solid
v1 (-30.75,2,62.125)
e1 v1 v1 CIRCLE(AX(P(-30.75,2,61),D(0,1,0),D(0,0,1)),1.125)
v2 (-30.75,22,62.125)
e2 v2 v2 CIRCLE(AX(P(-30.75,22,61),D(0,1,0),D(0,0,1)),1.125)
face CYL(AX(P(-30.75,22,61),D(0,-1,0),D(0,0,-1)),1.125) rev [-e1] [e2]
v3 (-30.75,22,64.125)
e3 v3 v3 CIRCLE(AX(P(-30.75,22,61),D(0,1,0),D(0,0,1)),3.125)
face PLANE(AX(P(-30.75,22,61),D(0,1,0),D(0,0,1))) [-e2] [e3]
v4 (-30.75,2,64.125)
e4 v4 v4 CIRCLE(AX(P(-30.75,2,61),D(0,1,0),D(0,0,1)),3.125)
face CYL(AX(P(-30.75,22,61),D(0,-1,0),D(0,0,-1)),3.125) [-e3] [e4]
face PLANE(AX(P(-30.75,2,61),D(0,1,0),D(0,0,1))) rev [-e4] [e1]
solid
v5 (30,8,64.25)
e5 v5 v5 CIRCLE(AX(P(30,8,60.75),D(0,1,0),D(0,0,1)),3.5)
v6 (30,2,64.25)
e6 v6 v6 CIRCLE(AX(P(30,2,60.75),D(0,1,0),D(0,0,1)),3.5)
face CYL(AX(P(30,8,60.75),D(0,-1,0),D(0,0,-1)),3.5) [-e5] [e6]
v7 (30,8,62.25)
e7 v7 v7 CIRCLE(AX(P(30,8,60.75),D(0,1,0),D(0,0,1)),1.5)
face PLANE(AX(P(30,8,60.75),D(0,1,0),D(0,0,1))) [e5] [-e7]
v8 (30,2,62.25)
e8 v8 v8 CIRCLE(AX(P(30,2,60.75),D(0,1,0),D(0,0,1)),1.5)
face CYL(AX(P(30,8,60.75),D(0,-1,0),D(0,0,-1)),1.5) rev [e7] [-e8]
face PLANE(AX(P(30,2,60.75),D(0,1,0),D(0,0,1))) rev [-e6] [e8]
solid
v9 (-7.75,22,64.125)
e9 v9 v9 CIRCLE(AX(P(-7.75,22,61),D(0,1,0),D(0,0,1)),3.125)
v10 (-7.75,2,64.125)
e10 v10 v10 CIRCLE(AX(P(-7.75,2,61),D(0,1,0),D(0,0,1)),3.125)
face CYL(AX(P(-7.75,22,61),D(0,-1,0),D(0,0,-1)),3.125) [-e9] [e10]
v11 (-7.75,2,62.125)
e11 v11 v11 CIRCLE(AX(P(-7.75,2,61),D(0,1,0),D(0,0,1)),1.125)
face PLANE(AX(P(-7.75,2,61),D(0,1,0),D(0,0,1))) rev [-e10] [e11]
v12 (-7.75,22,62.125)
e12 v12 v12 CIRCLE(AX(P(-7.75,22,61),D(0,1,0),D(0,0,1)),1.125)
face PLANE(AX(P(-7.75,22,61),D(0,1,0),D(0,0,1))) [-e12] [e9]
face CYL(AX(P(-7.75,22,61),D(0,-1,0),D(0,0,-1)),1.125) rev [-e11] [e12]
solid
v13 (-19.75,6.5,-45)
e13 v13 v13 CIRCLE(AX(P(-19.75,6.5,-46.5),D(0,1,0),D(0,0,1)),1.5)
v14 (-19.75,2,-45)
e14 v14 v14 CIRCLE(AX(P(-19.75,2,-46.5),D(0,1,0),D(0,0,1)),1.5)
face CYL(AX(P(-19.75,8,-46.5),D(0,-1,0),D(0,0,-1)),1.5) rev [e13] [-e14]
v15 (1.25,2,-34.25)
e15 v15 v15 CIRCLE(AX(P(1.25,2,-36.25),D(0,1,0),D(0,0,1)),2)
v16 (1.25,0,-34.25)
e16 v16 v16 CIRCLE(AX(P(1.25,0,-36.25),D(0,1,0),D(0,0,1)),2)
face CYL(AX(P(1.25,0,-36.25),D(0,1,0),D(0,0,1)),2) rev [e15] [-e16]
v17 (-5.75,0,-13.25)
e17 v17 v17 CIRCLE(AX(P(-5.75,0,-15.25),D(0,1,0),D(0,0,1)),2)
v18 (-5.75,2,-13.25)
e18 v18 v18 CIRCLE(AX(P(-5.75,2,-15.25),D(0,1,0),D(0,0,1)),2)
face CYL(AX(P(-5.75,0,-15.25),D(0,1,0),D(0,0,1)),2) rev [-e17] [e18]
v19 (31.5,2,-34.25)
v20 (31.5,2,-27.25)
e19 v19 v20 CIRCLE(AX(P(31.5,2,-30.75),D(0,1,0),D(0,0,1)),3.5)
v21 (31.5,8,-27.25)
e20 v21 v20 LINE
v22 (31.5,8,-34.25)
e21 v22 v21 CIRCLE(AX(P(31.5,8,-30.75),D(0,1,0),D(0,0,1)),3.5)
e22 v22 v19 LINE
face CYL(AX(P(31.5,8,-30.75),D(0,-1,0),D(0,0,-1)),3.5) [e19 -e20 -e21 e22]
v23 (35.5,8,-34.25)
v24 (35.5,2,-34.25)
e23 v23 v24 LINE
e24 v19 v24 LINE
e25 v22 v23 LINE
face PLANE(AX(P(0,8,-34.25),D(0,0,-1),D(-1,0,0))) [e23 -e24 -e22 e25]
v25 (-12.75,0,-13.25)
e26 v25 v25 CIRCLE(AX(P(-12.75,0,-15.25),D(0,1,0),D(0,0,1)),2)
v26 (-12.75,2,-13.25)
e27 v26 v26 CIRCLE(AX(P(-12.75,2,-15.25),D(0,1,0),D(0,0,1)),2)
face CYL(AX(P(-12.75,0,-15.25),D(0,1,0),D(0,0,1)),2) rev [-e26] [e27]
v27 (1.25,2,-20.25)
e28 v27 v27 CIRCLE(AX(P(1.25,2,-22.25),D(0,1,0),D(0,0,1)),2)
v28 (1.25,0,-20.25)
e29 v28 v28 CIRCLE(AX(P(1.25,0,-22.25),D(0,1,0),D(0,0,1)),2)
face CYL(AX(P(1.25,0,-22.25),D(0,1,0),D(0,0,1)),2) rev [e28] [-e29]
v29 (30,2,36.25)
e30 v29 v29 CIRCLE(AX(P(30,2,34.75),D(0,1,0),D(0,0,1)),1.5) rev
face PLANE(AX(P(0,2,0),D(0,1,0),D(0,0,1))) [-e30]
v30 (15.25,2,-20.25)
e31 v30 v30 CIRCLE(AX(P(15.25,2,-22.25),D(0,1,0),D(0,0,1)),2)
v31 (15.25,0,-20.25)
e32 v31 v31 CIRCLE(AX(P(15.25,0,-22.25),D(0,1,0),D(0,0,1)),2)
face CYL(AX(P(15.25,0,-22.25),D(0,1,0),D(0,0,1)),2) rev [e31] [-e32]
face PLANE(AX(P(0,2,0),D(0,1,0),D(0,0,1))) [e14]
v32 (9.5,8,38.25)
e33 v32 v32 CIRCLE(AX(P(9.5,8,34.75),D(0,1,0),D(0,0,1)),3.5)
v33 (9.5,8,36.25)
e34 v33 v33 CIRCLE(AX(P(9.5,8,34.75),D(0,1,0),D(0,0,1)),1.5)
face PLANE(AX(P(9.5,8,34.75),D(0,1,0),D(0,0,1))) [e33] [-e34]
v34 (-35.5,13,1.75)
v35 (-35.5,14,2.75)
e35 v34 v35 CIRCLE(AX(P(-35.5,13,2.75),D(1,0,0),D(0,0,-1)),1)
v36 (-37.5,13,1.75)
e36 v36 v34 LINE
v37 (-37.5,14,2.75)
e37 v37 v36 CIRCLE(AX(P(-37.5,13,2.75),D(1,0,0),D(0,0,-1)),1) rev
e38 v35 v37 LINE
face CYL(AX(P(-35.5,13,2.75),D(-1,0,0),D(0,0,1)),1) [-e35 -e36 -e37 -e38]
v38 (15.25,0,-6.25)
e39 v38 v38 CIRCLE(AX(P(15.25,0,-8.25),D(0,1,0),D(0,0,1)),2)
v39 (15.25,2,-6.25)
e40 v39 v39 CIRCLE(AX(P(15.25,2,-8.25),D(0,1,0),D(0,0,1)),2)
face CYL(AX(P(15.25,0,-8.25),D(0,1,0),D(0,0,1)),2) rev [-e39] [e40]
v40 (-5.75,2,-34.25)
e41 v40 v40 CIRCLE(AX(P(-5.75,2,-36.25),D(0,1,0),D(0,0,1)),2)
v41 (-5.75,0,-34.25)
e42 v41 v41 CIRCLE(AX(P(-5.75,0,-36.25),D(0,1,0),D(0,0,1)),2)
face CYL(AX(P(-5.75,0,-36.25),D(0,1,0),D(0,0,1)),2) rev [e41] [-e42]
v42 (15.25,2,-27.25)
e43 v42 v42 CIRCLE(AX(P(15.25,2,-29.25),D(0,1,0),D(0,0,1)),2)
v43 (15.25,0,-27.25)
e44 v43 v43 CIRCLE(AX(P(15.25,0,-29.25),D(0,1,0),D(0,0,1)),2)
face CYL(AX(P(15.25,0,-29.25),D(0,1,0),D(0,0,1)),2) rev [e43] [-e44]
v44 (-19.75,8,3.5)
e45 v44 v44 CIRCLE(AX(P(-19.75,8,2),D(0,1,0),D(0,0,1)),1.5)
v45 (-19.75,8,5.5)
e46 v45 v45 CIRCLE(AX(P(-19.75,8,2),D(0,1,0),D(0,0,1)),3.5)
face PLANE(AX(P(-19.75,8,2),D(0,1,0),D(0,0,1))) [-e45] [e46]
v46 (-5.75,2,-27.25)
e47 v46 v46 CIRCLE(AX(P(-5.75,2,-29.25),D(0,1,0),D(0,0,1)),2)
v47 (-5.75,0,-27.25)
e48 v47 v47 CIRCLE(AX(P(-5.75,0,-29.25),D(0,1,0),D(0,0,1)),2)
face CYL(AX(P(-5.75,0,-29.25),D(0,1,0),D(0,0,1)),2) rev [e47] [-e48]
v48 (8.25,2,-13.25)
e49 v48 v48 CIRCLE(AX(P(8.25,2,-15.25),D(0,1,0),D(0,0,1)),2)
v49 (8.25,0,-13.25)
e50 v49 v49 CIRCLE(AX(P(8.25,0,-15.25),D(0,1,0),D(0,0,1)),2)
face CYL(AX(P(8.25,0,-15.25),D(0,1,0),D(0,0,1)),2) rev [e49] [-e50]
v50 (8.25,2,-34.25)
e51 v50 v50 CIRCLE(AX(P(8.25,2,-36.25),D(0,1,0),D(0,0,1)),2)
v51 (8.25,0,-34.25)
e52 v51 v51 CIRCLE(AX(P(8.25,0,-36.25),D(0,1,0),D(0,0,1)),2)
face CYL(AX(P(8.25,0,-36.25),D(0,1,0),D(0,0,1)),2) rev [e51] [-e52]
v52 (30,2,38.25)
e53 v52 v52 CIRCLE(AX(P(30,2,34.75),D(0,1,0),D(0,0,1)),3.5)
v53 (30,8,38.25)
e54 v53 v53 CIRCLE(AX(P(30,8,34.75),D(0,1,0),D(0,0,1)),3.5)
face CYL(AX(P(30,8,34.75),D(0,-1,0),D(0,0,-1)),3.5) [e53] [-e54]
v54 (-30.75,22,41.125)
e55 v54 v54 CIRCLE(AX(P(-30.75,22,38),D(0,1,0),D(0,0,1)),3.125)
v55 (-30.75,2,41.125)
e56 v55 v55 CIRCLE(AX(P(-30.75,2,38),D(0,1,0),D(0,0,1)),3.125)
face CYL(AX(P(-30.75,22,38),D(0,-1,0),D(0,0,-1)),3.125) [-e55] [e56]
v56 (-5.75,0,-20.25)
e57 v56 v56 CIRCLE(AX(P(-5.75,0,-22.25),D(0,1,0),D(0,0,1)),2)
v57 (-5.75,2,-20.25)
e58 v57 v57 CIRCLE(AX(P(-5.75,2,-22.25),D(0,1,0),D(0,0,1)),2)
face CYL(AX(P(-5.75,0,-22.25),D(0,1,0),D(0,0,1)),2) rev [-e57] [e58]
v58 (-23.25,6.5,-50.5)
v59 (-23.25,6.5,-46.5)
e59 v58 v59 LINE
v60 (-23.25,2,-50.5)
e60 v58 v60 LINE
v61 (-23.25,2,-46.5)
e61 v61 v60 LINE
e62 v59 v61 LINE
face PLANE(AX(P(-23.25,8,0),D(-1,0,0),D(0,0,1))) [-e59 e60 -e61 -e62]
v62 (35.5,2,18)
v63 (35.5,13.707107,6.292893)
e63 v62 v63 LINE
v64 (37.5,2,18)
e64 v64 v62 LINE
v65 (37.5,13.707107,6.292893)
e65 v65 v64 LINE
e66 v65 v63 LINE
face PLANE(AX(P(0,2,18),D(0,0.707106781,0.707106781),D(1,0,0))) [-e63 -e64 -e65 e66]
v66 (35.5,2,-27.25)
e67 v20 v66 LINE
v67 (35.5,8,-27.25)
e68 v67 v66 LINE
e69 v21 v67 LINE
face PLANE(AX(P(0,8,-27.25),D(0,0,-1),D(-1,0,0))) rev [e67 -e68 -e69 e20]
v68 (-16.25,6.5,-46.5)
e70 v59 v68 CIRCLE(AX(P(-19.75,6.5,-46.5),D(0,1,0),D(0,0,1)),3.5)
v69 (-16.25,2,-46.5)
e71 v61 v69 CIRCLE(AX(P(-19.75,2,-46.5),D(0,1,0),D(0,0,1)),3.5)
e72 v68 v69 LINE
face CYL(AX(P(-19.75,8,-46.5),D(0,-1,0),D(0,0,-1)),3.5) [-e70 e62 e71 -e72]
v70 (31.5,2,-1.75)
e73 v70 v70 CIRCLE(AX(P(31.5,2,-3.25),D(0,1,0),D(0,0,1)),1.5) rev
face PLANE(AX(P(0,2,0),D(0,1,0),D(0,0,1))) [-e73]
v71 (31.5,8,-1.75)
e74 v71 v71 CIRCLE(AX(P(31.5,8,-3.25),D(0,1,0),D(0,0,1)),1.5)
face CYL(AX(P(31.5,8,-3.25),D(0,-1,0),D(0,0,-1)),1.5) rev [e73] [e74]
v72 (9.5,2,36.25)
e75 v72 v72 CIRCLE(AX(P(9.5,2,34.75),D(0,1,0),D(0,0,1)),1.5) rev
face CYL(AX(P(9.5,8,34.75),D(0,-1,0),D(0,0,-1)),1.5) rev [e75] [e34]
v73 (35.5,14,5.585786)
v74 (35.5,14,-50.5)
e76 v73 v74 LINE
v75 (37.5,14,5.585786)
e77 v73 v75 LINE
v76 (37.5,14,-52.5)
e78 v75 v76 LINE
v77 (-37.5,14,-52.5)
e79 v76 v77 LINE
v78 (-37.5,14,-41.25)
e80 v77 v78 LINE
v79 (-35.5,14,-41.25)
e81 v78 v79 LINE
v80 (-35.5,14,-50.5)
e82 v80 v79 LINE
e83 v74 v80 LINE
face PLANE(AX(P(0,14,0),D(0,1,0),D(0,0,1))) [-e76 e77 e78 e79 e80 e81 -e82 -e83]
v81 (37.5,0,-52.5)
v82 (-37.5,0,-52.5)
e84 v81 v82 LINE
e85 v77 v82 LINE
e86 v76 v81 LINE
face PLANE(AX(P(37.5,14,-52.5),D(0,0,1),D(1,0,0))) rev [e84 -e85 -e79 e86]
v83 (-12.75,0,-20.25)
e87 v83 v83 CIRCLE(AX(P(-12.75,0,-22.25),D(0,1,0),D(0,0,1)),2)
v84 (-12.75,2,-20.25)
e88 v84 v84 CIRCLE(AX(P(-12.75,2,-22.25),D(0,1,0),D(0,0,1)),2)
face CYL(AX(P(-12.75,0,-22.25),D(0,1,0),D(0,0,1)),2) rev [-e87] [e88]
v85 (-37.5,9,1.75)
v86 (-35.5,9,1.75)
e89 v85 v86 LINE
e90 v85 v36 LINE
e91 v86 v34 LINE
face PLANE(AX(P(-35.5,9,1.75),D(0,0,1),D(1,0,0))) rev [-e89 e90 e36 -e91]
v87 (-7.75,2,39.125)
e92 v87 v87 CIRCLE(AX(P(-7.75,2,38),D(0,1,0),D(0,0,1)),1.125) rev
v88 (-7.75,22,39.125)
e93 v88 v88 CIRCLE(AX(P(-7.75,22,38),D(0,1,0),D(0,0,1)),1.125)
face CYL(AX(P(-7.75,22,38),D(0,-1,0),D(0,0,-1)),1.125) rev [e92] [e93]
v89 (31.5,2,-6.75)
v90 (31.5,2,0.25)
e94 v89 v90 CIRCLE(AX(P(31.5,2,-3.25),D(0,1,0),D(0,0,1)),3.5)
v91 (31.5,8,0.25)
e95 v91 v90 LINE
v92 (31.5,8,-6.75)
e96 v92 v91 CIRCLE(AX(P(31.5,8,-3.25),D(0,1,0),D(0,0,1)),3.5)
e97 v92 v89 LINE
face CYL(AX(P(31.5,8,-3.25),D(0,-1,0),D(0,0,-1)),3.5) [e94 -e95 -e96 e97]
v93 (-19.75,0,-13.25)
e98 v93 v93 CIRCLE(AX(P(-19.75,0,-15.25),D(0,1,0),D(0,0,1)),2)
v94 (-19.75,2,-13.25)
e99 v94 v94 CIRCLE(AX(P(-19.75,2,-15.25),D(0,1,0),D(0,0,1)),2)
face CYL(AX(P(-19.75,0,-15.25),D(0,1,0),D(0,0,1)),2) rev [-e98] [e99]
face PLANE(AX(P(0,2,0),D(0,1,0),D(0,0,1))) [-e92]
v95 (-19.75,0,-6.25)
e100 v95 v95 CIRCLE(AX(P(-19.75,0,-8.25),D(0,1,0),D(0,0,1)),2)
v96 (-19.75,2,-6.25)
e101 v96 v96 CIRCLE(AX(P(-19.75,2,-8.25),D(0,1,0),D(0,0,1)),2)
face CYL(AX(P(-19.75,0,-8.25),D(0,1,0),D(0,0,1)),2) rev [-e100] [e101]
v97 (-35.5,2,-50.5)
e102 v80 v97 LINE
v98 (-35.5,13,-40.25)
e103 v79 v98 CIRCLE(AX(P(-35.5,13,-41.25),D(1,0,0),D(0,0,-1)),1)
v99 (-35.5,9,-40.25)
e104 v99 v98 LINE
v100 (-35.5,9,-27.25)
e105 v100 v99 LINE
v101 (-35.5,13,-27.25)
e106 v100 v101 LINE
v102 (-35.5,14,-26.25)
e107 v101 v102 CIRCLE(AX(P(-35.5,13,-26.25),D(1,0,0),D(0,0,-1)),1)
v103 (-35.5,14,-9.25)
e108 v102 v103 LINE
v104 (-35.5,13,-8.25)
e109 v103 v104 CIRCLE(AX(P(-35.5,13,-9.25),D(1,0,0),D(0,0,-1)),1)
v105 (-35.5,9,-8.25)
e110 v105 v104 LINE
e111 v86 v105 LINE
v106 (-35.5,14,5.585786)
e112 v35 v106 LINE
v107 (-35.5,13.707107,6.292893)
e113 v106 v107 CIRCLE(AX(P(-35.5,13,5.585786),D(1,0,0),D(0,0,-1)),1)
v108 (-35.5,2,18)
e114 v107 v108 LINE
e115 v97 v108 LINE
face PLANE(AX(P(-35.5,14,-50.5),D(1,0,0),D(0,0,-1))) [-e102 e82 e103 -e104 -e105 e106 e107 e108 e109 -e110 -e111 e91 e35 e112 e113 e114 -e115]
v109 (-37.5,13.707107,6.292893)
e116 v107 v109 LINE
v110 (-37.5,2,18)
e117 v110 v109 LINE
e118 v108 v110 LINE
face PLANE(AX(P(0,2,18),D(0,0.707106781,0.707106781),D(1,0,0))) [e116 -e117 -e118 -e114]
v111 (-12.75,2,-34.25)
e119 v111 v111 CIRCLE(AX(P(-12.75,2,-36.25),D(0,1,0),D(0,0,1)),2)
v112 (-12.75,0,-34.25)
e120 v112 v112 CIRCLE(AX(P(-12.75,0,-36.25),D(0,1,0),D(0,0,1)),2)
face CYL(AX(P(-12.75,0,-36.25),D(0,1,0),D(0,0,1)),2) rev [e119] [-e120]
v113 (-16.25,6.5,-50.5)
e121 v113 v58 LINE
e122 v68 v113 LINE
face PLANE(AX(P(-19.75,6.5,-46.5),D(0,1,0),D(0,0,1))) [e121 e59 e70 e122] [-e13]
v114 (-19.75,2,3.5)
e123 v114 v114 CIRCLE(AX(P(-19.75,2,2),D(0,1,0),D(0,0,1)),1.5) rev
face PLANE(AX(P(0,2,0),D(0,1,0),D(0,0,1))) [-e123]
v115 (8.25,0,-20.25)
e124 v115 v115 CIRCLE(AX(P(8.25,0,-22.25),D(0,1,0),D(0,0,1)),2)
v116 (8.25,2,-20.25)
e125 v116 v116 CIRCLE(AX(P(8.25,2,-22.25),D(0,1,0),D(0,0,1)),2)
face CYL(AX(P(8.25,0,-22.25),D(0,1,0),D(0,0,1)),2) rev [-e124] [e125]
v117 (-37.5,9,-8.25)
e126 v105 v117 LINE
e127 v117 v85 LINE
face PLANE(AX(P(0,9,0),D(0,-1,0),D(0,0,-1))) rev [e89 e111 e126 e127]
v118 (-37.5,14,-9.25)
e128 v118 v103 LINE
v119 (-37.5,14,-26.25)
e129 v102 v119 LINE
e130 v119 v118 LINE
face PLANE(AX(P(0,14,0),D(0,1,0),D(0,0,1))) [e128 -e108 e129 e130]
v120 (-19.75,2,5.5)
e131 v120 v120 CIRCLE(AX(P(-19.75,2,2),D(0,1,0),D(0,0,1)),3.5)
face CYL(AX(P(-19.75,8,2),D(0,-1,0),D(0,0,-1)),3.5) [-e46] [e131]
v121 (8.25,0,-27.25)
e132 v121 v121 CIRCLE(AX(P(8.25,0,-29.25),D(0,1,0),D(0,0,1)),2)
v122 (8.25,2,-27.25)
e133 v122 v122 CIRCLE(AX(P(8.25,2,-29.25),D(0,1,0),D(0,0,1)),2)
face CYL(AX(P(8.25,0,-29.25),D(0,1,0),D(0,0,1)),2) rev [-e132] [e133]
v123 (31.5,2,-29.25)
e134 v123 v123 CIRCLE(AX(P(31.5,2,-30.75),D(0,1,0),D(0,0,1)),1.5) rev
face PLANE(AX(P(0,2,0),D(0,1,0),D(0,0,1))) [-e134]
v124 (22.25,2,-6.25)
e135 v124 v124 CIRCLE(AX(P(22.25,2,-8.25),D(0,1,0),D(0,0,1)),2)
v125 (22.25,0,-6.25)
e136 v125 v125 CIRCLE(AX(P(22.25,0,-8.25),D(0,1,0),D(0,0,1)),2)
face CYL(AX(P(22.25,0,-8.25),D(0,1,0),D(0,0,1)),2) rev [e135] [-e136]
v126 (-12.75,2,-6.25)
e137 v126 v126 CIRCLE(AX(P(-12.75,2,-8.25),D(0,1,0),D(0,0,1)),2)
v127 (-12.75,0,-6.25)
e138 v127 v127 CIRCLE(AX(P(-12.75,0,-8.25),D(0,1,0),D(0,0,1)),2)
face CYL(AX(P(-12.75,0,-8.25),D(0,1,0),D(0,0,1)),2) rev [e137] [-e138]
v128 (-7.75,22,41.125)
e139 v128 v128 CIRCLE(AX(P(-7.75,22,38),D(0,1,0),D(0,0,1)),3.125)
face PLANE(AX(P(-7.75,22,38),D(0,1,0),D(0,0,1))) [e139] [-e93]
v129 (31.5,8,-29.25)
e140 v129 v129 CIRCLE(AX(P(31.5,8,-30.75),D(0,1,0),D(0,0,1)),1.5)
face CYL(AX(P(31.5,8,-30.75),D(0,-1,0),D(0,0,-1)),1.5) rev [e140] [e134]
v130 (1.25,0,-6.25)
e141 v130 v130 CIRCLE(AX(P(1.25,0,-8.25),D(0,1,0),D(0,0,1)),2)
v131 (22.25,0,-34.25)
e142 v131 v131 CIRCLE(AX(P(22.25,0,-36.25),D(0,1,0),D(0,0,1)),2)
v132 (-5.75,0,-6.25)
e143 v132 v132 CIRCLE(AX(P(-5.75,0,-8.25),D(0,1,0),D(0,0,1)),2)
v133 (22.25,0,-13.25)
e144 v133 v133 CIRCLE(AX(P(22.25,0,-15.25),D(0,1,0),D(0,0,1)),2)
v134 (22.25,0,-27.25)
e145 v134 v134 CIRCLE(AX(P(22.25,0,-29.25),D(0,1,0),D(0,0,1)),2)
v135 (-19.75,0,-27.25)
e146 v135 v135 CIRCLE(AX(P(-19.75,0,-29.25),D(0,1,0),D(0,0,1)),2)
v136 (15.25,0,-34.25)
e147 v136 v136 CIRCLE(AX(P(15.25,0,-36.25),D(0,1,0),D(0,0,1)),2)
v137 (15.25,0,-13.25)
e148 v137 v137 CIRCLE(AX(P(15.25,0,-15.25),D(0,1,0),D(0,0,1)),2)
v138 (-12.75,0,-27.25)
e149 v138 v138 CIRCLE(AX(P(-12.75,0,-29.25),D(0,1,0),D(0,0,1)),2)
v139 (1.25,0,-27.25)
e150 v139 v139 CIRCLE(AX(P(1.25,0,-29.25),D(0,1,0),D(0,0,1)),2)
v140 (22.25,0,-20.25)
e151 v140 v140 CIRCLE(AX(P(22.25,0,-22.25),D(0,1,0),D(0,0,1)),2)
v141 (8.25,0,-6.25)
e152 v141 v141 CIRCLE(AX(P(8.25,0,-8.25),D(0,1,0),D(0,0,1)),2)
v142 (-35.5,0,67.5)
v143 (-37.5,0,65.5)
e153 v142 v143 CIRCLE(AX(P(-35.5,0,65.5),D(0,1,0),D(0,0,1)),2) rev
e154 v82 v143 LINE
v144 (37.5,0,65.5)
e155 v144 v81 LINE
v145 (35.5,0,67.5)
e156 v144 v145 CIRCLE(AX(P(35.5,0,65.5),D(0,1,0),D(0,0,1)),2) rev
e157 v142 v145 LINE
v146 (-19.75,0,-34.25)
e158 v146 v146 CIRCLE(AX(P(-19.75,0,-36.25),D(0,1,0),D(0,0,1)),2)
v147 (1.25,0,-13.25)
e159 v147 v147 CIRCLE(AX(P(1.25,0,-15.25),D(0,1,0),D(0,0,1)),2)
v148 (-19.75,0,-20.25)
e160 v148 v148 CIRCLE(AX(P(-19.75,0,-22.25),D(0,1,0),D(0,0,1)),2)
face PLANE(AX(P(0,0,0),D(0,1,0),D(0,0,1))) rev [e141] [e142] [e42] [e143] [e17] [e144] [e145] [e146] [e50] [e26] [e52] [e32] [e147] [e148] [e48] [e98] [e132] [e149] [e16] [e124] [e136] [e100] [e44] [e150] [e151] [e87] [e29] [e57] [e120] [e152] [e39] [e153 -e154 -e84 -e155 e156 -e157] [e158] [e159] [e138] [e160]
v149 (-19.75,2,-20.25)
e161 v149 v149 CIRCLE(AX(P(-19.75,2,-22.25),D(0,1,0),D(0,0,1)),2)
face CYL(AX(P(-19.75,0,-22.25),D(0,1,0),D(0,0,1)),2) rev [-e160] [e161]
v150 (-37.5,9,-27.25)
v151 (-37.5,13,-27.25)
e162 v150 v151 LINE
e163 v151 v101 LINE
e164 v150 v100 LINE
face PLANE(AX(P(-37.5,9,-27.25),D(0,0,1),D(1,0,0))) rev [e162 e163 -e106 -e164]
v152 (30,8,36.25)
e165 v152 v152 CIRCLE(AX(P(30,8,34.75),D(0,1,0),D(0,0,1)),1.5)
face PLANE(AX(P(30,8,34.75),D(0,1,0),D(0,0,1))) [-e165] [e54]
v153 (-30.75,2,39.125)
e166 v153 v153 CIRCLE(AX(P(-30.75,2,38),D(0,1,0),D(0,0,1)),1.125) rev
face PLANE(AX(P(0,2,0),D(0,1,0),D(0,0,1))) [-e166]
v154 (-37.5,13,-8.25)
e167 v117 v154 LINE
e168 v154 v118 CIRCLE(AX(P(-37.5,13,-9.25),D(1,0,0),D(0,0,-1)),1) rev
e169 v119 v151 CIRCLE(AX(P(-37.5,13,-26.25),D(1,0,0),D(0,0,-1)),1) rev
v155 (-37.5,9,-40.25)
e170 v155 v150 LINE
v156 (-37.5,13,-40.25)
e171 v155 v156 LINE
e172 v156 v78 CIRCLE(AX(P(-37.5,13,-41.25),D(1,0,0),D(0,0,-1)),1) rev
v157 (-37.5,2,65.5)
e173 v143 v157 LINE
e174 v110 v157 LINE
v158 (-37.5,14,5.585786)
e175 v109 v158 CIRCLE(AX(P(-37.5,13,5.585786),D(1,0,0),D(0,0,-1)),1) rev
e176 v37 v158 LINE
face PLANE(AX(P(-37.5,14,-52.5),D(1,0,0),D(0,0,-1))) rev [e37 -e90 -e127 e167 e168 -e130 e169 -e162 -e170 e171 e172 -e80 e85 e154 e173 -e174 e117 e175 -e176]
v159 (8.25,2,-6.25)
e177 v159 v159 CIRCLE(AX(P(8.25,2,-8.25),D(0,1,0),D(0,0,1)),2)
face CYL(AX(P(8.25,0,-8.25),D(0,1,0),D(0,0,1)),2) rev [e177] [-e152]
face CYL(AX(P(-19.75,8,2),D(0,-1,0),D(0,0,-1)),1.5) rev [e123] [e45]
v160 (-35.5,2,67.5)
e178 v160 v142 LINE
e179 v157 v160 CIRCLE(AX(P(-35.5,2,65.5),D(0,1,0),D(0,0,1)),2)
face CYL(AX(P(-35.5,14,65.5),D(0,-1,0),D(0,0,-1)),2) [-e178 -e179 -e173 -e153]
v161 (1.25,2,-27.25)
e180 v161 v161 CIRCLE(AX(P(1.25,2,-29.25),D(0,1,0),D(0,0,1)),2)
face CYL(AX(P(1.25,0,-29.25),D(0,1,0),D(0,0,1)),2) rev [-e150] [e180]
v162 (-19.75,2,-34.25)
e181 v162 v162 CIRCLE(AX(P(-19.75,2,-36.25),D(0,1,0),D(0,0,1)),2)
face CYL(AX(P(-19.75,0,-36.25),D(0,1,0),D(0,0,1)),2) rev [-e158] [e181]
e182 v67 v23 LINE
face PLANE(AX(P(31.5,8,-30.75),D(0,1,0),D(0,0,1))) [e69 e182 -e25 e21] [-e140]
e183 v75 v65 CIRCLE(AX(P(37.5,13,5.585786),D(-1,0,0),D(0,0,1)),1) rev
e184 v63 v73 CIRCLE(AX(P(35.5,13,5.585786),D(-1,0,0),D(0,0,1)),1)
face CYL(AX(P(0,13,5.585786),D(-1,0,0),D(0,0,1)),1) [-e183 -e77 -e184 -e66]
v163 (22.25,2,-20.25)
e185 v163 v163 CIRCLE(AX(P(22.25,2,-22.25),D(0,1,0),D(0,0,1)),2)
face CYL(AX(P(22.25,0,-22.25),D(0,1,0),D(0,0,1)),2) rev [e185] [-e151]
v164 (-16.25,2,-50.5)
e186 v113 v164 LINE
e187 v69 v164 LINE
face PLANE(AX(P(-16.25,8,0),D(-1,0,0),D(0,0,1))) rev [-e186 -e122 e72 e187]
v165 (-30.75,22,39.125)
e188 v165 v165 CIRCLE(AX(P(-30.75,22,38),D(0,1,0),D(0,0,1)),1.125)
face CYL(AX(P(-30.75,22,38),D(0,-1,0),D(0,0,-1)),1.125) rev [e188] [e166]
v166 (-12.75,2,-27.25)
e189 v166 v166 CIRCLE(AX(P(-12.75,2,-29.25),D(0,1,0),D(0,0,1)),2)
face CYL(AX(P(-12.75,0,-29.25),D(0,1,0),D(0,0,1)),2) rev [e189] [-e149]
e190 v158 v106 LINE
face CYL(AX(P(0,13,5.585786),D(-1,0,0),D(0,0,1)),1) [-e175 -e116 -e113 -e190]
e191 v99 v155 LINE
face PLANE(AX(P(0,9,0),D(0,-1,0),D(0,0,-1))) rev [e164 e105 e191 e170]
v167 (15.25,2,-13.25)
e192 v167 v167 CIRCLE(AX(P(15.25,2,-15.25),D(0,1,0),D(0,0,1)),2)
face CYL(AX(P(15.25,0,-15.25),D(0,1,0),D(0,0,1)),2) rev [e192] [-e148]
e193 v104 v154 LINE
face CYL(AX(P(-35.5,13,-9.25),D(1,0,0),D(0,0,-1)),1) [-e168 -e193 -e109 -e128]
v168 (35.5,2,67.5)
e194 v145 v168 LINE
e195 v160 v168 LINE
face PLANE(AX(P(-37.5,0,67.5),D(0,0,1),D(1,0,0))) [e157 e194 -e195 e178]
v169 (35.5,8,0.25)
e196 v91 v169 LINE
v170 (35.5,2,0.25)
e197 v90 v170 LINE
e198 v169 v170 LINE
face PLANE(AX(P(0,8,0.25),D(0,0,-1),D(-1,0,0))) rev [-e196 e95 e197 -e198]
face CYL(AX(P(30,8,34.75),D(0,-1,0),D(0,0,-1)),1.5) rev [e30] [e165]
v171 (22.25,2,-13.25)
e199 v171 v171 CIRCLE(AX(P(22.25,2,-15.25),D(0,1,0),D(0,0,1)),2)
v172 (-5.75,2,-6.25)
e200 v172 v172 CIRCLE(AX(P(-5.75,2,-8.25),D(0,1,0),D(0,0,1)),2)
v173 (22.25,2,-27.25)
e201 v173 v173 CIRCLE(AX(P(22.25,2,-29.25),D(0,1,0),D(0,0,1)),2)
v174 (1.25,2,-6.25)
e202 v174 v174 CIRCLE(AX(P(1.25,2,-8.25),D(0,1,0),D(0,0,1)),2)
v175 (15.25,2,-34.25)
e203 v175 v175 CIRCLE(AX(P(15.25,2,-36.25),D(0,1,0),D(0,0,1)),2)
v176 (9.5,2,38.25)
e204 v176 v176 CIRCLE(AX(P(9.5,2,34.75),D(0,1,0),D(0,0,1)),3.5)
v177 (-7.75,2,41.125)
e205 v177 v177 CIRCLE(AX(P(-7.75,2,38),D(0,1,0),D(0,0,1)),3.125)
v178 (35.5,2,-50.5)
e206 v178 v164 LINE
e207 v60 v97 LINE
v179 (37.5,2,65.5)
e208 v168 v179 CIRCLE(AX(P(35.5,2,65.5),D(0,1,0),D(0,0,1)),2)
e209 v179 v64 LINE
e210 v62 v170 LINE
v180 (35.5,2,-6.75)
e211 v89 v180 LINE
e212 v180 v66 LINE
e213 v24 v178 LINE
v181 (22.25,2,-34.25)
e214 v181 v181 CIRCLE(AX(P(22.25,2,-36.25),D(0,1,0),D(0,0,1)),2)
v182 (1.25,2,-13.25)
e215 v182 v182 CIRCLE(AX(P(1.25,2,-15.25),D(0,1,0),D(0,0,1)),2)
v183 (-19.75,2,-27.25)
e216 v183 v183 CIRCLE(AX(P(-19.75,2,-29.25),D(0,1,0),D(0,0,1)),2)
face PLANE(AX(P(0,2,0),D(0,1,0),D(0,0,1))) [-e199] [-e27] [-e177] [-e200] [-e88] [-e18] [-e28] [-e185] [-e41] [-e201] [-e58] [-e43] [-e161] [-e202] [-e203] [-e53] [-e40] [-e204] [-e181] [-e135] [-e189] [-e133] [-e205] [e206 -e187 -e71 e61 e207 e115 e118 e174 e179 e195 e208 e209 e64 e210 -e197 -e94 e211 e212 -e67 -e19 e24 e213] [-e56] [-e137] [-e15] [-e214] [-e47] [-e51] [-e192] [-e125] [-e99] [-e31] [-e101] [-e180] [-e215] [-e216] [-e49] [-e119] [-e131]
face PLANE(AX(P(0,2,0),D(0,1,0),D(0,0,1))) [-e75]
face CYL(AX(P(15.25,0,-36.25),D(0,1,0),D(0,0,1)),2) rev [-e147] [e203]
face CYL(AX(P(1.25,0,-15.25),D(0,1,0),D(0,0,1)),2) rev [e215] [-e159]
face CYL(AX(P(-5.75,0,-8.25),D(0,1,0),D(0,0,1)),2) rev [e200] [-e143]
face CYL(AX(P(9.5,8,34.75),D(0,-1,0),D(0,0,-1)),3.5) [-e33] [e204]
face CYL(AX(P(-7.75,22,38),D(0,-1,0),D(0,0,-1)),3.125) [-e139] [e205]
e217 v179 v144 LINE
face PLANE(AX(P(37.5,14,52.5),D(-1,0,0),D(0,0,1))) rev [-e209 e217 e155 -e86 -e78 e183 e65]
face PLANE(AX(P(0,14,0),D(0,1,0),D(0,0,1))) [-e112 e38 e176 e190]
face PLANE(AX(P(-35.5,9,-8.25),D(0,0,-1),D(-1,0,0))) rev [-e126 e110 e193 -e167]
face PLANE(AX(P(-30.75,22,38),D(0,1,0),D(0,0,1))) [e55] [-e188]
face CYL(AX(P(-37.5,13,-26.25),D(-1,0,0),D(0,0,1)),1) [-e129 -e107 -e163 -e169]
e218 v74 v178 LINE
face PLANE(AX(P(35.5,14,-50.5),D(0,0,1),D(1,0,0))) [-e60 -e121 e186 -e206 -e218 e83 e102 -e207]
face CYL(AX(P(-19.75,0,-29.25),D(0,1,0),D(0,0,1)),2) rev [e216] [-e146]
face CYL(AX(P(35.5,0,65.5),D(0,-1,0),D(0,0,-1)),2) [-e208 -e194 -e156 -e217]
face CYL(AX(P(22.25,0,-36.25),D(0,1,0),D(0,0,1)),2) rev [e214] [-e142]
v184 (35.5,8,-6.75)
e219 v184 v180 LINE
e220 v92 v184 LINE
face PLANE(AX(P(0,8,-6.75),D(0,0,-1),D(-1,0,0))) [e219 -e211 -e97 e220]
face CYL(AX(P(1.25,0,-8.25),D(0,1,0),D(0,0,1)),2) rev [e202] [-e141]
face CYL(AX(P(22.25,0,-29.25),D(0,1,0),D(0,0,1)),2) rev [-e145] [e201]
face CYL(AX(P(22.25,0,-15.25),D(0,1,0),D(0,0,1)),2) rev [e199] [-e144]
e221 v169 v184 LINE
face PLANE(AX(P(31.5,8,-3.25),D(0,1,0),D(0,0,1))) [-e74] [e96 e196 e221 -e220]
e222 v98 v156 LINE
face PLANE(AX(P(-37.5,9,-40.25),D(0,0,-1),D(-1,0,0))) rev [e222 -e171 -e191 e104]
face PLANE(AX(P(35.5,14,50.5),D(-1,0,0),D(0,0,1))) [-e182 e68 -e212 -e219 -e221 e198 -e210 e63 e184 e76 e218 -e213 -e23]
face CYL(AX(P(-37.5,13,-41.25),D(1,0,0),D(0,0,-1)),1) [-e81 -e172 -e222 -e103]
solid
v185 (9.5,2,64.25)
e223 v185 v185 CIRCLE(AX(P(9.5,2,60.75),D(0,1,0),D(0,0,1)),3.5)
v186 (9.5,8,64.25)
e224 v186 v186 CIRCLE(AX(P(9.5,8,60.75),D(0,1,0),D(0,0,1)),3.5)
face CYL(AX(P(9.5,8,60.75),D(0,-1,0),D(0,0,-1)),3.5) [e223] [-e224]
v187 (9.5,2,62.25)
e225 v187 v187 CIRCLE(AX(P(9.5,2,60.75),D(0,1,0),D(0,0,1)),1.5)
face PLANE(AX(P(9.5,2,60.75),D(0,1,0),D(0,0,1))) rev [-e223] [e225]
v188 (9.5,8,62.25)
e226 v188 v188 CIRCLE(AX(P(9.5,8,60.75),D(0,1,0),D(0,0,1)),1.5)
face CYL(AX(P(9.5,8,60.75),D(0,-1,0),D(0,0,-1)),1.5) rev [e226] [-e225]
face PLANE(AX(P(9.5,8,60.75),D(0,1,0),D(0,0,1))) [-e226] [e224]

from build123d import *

# Parameters (mm, degrees)
SKETCH1_W                = 70
SKETCH1_H                = 100
BOSS_EXTRUDE1_DEPTH      = 2
SKETCH2_R                = 3.5
SKETCH2_R_2              = 1.5
BOSS_EXTRUDE2_DEPTH      = 6
BOSS_EXTRUDE3_START      = -2
SKETCH3_R                = 3.5
BOSS_EXTRUDE3_DEPTH      = 2
BOSS_EXTRUDE4_DEPTH      = 12
BOSS_EXTRUDE4_DEPTH_BACK = 2
SKETCH4_W                = 75
SKETCH4_H                = 105
SKETCH4_W_2              = 71
SKETCH4_H_2              = 101
BOSS_EXTRUDE5_DEPTH      = 6
SKETCH8_W                = 75
SKETCH8_H                = 46.5
CUT_EXTRUDE1_DEPTH       = 66.623928563
SKETCH9_W                = 2
SKETCH9_H                = 13
SKETCH9_H_2              = 10
CUT_EXTRUDE2_DEPTH       = 5
CHAMFER1_SIZE            = 12
FILLET2_START            = -38
FILLET2_DEPTH            = 73.5
FILLET2_START_2          = -35.5
FILLET2_2_DEPTH          = 73.5
SKETCH10_R               = 3.5
SKETCH10_R_2             = 1.5
BOSS_EXTRUDE6_DEPTH      = 6
SKETCH11_R               = 3.125
SKETCH11_R_2             = 1.125
BOSS_EXTRUDE7_DEPTH      = 20
SKETCH12_R               = 2
CUT_EXTRUDE3_DEPTH       = 78.034489029
SKETCH14_W               = 75
SKETCH14_H               = 15
BOSS_EXTRUDE8_DEPTH      = 2
FILLET3_R                = 2
CUT_EXTRUDE4_DEPTH       = 1.5


with BuildPart() as part:
    # Sketch1 → Boss-Extrude1 (new body)
    with BuildSketch(Plane(origin=(0, 0, 0), x_dir=(1, 0, 0), z_dir=(0, 1, 0))):
        Rectangle(SKETCH1_W, SKETCH1_H)
    extrude(amount=BOSS_EXTRUDE1_DEPTH)

    # Sketch2 → Boss-Extrude2 (add)
    # profile 1 of 4: a face of its own
    with BuildSketch(Plane(origin=(0, 2, 0), x_dir=(1, 0, 0), z_dir=(0, 1, 0))):
        with Locations(Location((-19.75, 46.5, 0), (0, 0, 90))):
            Circle(SKETCH2_R)
        with Locations(Location((-19.75, 46.5, 0), (0, 0, 270))):
            Circle(SKETCH2_R_2, mode=Mode.SUBTRACT)
    # profile 2 of 4: a face of its own
    with BuildSketch(Plane(origin=(0, 2, 0), x_dir=(1, 0, 0), z_dir=(0, 1, 0))):
        with Locations((31.5, 30.75)):
            Circle(SKETCH2_R)
        with Locations(Location((31.5, 30.75, 0), (0, 0, 270))):
            Circle(SKETCH2_R_2, mode=Mode.SUBTRACT)
    # profile 3 of 4: a face of its own
    with BuildSketch(Plane(origin=(0, 2, 0), x_dir=(1, 0, 0), z_dir=(0, 1, 0))):
        with Locations((31.5, 3.25)):
            Circle(SKETCH2_R)
        with Locations(Location((31.5, 3.25, 0), (0, 0, 270))):
            Circle(SKETCH2_R_2, mode=Mode.SUBTRACT)
    # profile 4 of 4: a face of its own
    with BuildSketch(Plane(origin=(0, 2, 0), x_dir=(1, 0, 0), z_dir=(0, 1, 0))):
        with Locations(Location((-19.75, -2, 0), (0, 0, 270))):
            Circle(SKETCH2_R)
        with Locations(Location((-19.75, -2, 0), (0, 0, 270))):
            Circle(SKETCH2_R_2, mode=Mode.SUBTRACT)
    extrude(amount=BOSS_EXTRUDE2_DEPTH)

    # Sketch3 → Boss-Extrude3 (add)
    # profile 1 of 4: a face of its own
    with BuildSketch(Plane(origin=(0, 2, 0), x_dir=(1, 0, 0), z_dir=(0, 1, 0)).offset(BOSS_EXTRUDE3_START)):
        Polygon((-19.75, 50.5), (-35.5, 50.5), (-35.5, -50.5), (35.5, -50.5), (35.5, 3.25), (35.5, 50.5), align=None)
        Polygon((35, -50), (35, 3.25), (35, 30.75), (35, 50), (-19.75, 50), (-35, 50), (-35, -50), align=None, mode=Mode.SUBTRACT)
    # profile 2 of 4: a face of its own
    with BuildSketch(Plane(origin=(0, 2, 0), x_dir=(1, 0, 0), z_dir=(0, 1, 0)).offset(BOSS_EXTRUDE3_START)):
        with Locations(Location((31.5, 3.25, 0), (0, 0, 270))):
            Circle(SKETCH3_R)
    # profile 3 of 4: a face of its own
    with BuildSketch(Plane(origin=(0, 2, 0), x_dir=(1, 0, 0), z_dir=(0, 1, 0)).offset(BOSS_EXTRUDE3_START)):
        with Locations(Location((31.5, 30.75, 0), (0, 0, 270))):
            Circle(SKETCH3_R)
    # profile 4 of 4: a face of its own
    with BuildSketch(Plane(origin=(0, 2, 0), x_dir=(1, 0, 0), z_dir=(0, 1, 0)).offset(BOSS_EXTRUDE3_START)):
        with Locations(Location((-19.75, 46.5, 0), (0, 0, 270))):
            Circle(SKETCH3_R)
    extrude(amount=BOSS_EXTRUDE3_DEPTH)

    # Sketch4 → Boss-Extrude4 (add, two sides: drawn at the far end of the back side and taken through both)
    with BuildSketch(Plane(origin=(0, 2, 0), x_dir=(1, 0, 0), z_dir=(0, 1, 0)).offset(-BOSS_EXTRUDE4_DEPTH_BACK)):
        Rectangle(SKETCH4_W, SKETCH4_H)
        Rectangle(SKETCH4_W_2, SKETCH4_H_2, mode=Mode.SUBTRACT)
    extrude(amount=BOSS_EXTRUDE4_DEPTH + BOSS_EXTRUDE4_DEPTH_BACK)

    # Sketch6 → Boss-Extrude5 (add)
    with BuildSketch(Plane(origin=(0, 2, 0), x_dir=(1, 0, 0), z_dir=(0, 1, 0))):
        with BuildLine():
            Line((31.5, -0.25), (35.5, -0.25))
            Line((35.5, -0.25), (35.5, 6.75))
            Line((35.5, 6.75), (31.5, 6.75))
            ThreePointArc((31.5, 6.75), (33.974873734, 5.724873734), (35, 3.25))
            ThreePointArc((35, 3.25), (33.974873734, 0.775126266), (31.5, -0.25))
        make_face()
        with BuildLine():
            Line((31.5, 27.25), (35.5, 27.25))
            Line((35.5, 27.25), (35.5, 34.25))
            Line((35.5, 34.25), (31.5, 34.25))
            ThreePointArc((31.5, 34.25), (33.974873734, 33.224873734), (35, 30.75))
            ThreePointArc((35, 30.75), (33.974873734, 28.275126266), (31.5, 27.25))
        make_face()
        with BuildLine():
            Line((-16.25, 46.5), (-16.25, 50.5))
            Line((-16.25, 50.5), (-23.25, 50.5))
            Line((-23.25, 50.5), (-23.25, 46.5))
            ThreePointArc((-23.25, 46.5), (-19.75, 50), (-16.25, 46.5))
        make_face()
    extrude(amount=BOSS_EXTRUDE5_DEPTH)

    # Sketch8 → Cut-Extrude1 (cut, through all)
    with BuildSketch(Plane(origin=(0, 2, 0), x_dir=(1, 0, 0), z_dir=(0, 1, 0))):
        with Locations((0, -29.25)):
            Rectangle(SKETCH8_W, SKETCH8_H)
    extrude(amount=CUT_EXTRUDE1_DEPTH, mode=Mode.SUBTRACT)

    # Sketch9 → Cut-Extrude2 (cut)
    with BuildSketch(Plane(origin=(0, 14, 0), x_dir=(1, 0, 0), z_dir=(0, 1, 0))):
        with Locations((-36.5, 33.75)):
            Rectangle(SKETCH9_W, SKETCH9_H)
        with Locations((-36.5, 3.25)):
            Rectangle(SKETCH9_W, SKETCH9_H_2)
    extrude(amount=-CUT_EXTRUDE2_DEPTH, mode=Mode.SUBTRACT)

    # Chamfer1
    chamfer1_edges = [part.edges().sort_by_distance(p)[0] for p in [
        (36.5, 2, 6),
        (-36.5, 2, 6),
    ]]
    chamfer(chamfer1_edges, length=CHAMFER1_SIZE - 0.0001)  # a hair under: the kernel refuses the full size

    # Fillet2: read off the stored shape, not the designer's step
    # Fillet2 outline → Fillet2 (cut)
    with BuildSketch(Plane.YZ.offset(FILLET2_START)):
        with BuildLine():
            Line((14, 6), (13.707106781, 6.292893219))
            ThreePointArc((13.707106781, 6.292893219), (13.923879533, 5.96846987), (14, 5.585786438))
            Line((14, 5.585786438), (14, 6))
        make_face()
        with BuildLine():
            Line((14, -41.25), (14, -40.25))
            Line((14, -40.25), (13, -40.25))
            ThreePointArc((13, -40.25), (13.707106781, -40.542893219), (14, -41.25))
        make_face()
        with BuildLine():
            Line((14, -27.25), (14, -26.25))
            ThreePointArc((14, -26.25), (13.707106781, -26.957106781), (13, -27.25))
            Line((13, -27.25), (14, -27.25))
        make_face()
        with BuildLine():
            Line((14, -9.25), (14, -8.25))
            Line((14, -8.25), (13, -8.25))
            ThreePointArc((13, -8.25), (13.707106781, -8.542893219), (14, -9.25))
        make_face()
        with BuildLine():
            Line((14, 1.75), (14, 2.75))
            ThreePointArc((14, 2.75), (13.707106781, 2.042893219), (13, 1.75))
            Line((13, 1.75), (14, 1.75))
        make_face()
    extrude(amount=FILLET2_DEPTH, mode=Mode.SUBTRACT)

    # Fillet2 2 outline → Fillet2 2 (cut)
    with BuildSketch(Plane.YZ.offset(FILLET2_START_2)):
        with BuildLine():
            Line((14, 6), (13.707106781, 6.292893219))
            ThreePointArc((13.707106781, 6.292893219), (13.923879533, 5.96846987), (14, 5.585786438))
            Line((14, 5.585786438), (14, 6))
        make_face()
    extrude(amount=FILLET2_2_DEPTH, mode=Mode.SUBTRACT)

    # Sketch10 → Boss-Extrude6 (add)
    # profile 1 of 4: a face of its own
    with BuildSketch(Plane(origin=(0, 2, 0), x_dir=(1, 0, 0), z_dir=(0, 1, 0))):
        with Locations(Location((9.5, -34.75, 0), (0, 0, 270))):
            Circle(SKETCH10_R)
        with Locations(Location((9.5, -34.75, 0), (0, 0, 270))):
            Circle(SKETCH10_R_2, mode=Mode.SUBTRACT)
    # profile 2 of 4: a face of its own
    with BuildSketch(Plane(origin=(0, 2, 0), x_dir=(1, 0, 0), z_dir=(0, 1, 0))):
        with Locations(Location((30, -34.75, 0), (0, 0, 270))):
            Circle(SKETCH10_R)
        with Locations(Location((30, -34.75, 0), (0, 0, 270))):
            Circle(SKETCH10_R_2, mode=Mode.SUBTRACT)
    # profile 3 of 4: a face of its own
    with BuildSketch(Plane(origin=(0, 2, 0), x_dir=(1, 0, 0), z_dir=(0, 1, 0))):
        with Locations(Location((30, -60.75, 0), (0, 0, 270))):
            Circle(SKETCH10_R)
        with Locations(Location((30, -60.75, 0), (0, 0, 270))):
            Circle(SKETCH10_R_2, mode=Mode.SUBTRACT)
    # profile 4 of 4: a face of its own
    with BuildSketch(Plane(origin=(0, 2, 0), x_dir=(1, 0, 0), z_dir=(0, 1, 0))):
        with Locations(Location((9.5, -60.75, 0), (0, 0, 270))):
            Circle(SKETCH10_R)
        with Locations(Location((9.5, -60.75, 0), (0, 0, 270))):
            Circle(SKETCH10_R_2, mode=Mode.SUBTRACT)
    extrude(amount=BOSS_EXTRUDE6_DEPTH)


with BuildPart() as boss_extrude6_piece_1:
    # of the separate pieces the step leaves, piece 1, a body of its own (boss_extrude6_pieces)
    add(part.part.solids().sort_by_distance((-37.5, 2, 17.9999))[0])

    # Sketch11 → Boss-Extrude7 (add)
    # profile 1 of 4: a face of its own
    with BuildSketch(Plane(origin=(0, 2, 0), x_dir=(1, 0, 0), z_dir=(0, 1, 0))):
        with Locations(Location((-30.75, -38, 0), (0, 0, 270))):
            Circle(SKETCH11_R)
        with Locations(Location((-30.75, -38, 0), (0, 0, 270))):
            Circle(SKETCH11_R_2, mode=Mode.SUBTRACT)
    # profile 2 of 4: a face of its own
    with BuildSketch(Plane(origin=(0, 2, 0), x_dir=(1, 0, 0), z_dir=(0, 1, 0))):
        with Locations(Location((-7.75, -38, 0), (0, 0, 270))):
            Circle(SKETCH11_R)
        with Locations(Location((-7.75, -38, 0), (0, 0, 270))):
            Circle(SKETCH11_R_2, mode=Mode.SUBTRACT)
    # profile 3 of 4: a face of its own
    with BuildSketch(Plane(origin=(0, 2, 0), x_dir=(1, 0, 0), z_dir=(0, 1, 0))):
        with Locations(Location((-7.75, -61, 0), (0, 0, 270))):
            Circle(SKETCH11_R)
        with Locations(Location((-7.75, -61, 0), (0, 0, 270))):
            Circle(SKETCH11_R_2, mode=Mode.SUBTRACT)
    # profile 4 of 4: a face of its own
    with BuildSketch(Plane(origin=(0, 2, 0), x_dir=(1, 0, 0), z_dir=(0, 1, 0))):
        with Locations(Location((-30.75, -61, 0), (0, 0, 270))):
            Circle(SKETCH11_R)
        with Locations(Location((-30.75, -61, 0), (0, 0, 270))):
            Circle(SKETCH11_R_2, mode=Mode.SUBTRACT)
    extrude(amount=BOSS_EXTRUDE7_DEPTH)


with BuildPart() as boss_extrude6_piece_2:
    # of the separate pieces the step leaves, piece 2, a body of its own (boss_extrude6_pieces)
    add(part.part.solids().sort_by_distance((9.5, 2, 64.25))[0])


with BuildPart() as boss_extrude6_piece_3:
    # of the separate pieces the step leaves, piece 3, a body of its own (boss_extrude6_pieces)
    add(part.part.solids().sort_by_distance((30, 2, 64.25))[0])


with BuildPart() as boss_extrude7_piece_1:
    # of the separate pieces the step leaves, piece 1, a body of its own (boss_extrude7_pieces)
    add(boss_extrude6_piece_1.part.solids().sort_by_distance((-37.5, 2, 17.9999))[0])

    # Sketch12 → Cut-Extrude3 (cut, through all)
    with BuildSketch(Plane(origin=(0, 2, 0), x_dir=(1, 0, 0), z_dir=(0, 1, 0))):
        with Locations(Location((-19.75, 36.25, 0), (0, 0, 270))):
            Circle(SKETCH12_R)
        with Locations(Location((-12.75, 36.25, 0), (0, 0, 270))):
            Circle(SKETCH12_R)
        with Locations(Location((-5.75, 36.25, 0), (0, 0, 270))):
            Circle(SKETCH12_R)
        with Locations(Location((1.25, 36.25, 0), (0, 0, 270))):
            Circle(SKETCH12_R)
        with Locations(Location((8.25, 36.25, 0), (0, 0, 270))):
            Circle(SKETCH12_R)
        with Locations(Location((15.25, 36.25, 0), (0, 0, 270))):
            Circle(SKETCH12_R)
        with Locations(Location((22.25, 36.25, 0), (0, 0, 270))):
            Circle(SKETCH12_R)
        with Locations(Location((-12.75, 29.25, 0), (0, 0, 270))):
            Circle(SKETCH12_R)
        with Locations(Location((-5.75, 29.25, 0), (0, 0, 270))):
            Circle(SKETCH12_R)
        with Locations(Location((1.25, 29.25, 0), (0, 0, 270))):
            Circle(SKETCH12_R)
        with Locations(Location((8.25, 29.25, 0), (0, 0, 270))):
            Circle(SKETCH12_R)
        with Locations(Location((15.25, 29.25, 0), (0, 0, 270))):
            Circle(SKETCH12_R)
        with Locations(Location((22.25, 29.25, 0), (0, 0, 270))):
            Circle(SKETCH12_R)
        with Locations(Location((-12.75, 22.25, 0), (0, 0, 270))):
            Circle(SKETCH12_R)
        with Locations(Location((-5.75, 22.25, 0), (0, 0, 270))):
            Circle(SKETCH12_R)
        with Locations(Location((1.25, 22.25, 0), (0, 0, 270))):
            Circle(SKETCH12_R)
        with Locations(Location((8.25, 22.25, 0), (0, 0, 270))):
            Circle(SKETCH12_R)
        with Locations(Location((15.25, 22.25, 0), (0, 0, 270))):
            Circle(SKETCH12_R)
        with Locations(Location((22.25, 22.25, 0), (0, 0, 270))):
            Circle(SKETCH12_R)
        with Locations(Location((-12.75, 15.25, 0), (0, 0, 270))):
            Circle(SKETCH12_R)
        with Locations(Location((-5.75, 15.25, 0), (0, 0, 270))):
            Circle(SKETCH12_R)
        with Locations(Location((1.25, 15.25, 0), (0, 0, 270))):
            Circle(SKETCH12_R)
        with Locations(Location((8.25, 15.25, 0), (0, 0, 270))):
            Circle(SKETCH12_R)
        with Locations(Location((15.25, 15.25, 0), (0, 0, 270))):
            Circle(SKETCH12_R)
        with Locations(Location((22.25, 15.25, 0), (0, 0, 270))):
            Circle(SKETCH12_R)
        with Locations(Location((-12.75, 8.25, 0), (0, 0, 270))):
            Circle(SKETCH12_R)
        with Locations(Location((-5.75, 8.25, 0), (0, 0, 270))):
            Circle(SKETCH12_R)
        with Locations(Location((1.25, 8.25, 0), (0, 0, 270))):
            Circle(SKETCH12_R)
        with Locations(Location((8.25, 8.25, 0), (0, 0, 270))):
            Circle(SKETCH12_R)
        with Locations(Location((15.25, 8.25, 0), (0, 0, 270))):
            Circle(SKETCH12_R)
        with Locations(Location((22.25, 8.25, 0), (0, 0, 270))):
            Circle(SKETCH12_R)
        with Locations(Location((-19.75, 29.25, 0), (0, 0, 270))):
            Circle(SKETCH12_R)
        with Locations(Location((-19.75, 22.25, 0), (0, 0, 270))):
            Circle(SKETCH12_R)
        with Locations(Location((-19.75, 15.25, 0), (0, 0, 270))):
            Circle(SKETCH12_R)
        with Locations(Location((-19.75, 8.25, 0), (0, 0, 270))):
            Circle(SKETCH12_R)
    extrude(amount=-CUT_EXTRUDE3_DEPTH, mode=Mode.SUBTRACT)

    # Sketch14 → Boss-Extrude8 (add)
    with BuildSketch(Plane(origin=(0, 2, 0), x_dir=(1, 0, 0), z_dir=(0, 1, 0))):
        with Locations((0, -60)):
            Rectangle(SKETCH14_W, SKETCH14_H)
    extrude(amount=-BOSS_EXTRUDE8_DEPTH)

    # Fillet3
    fillet3_edges = [boss_extrude7_piece_1.edges().sort_by_distance(p)[0] for p in [
        (37.5, 1, 67.5),
        (-37.5, 1, 67.5),
    ]]
    fillet(fillet3_edges, radius=FILLET3_R)

    # Sketch15 → Cut-Extrude4 (cut)
    with BuildSketch(Plane(origin=(0, 8, 0), x_dir=(1, 0, 0), z_dir=(0, 1, 0))):
        with BuildLine():
            Line((-16.25, 46.5), (-16.25, 50.5))
            Line((-16.25, 50.5), (-23.25, 50.5))
            Line((-23.25, 50.5), (-23.25, 46.5))
            ThreePointArc((-23.25, 46.5), (-19.75, 43), (-16.25, 46.5))
        make_face()
    extrude(amount=-CUT_EXTRUDE4_DEPTH, mode=Mode.SUBTRACT)


with BuildPart() as boss_extrude7_piece_2:
    # of the separate pieces the step leaves, piece 2, a body of its own (boss_extrude7_pieces)
    add(boss_extrude6_piece_1.part.solids().sort_by_distance((-30.75, 2, 64.125))[0])


with BuildPart() as boss_extrude7_piece_3:
    # of the separate pieces the step leaves, piece 3, a body of its own (boss_extrude7_pieces)
    add(boss_extrude6_piece_1.part.solids().sort_by_distance((-7.75, 2, 64.125))[0])


solid = Compound([boss_extrude6_piece_2.part, boss_extrude6_piece_3.part, boss_extrude7_piece_1.part, boss_extrude7_piece_2.part, boss_extrude7_piece_3.part])
